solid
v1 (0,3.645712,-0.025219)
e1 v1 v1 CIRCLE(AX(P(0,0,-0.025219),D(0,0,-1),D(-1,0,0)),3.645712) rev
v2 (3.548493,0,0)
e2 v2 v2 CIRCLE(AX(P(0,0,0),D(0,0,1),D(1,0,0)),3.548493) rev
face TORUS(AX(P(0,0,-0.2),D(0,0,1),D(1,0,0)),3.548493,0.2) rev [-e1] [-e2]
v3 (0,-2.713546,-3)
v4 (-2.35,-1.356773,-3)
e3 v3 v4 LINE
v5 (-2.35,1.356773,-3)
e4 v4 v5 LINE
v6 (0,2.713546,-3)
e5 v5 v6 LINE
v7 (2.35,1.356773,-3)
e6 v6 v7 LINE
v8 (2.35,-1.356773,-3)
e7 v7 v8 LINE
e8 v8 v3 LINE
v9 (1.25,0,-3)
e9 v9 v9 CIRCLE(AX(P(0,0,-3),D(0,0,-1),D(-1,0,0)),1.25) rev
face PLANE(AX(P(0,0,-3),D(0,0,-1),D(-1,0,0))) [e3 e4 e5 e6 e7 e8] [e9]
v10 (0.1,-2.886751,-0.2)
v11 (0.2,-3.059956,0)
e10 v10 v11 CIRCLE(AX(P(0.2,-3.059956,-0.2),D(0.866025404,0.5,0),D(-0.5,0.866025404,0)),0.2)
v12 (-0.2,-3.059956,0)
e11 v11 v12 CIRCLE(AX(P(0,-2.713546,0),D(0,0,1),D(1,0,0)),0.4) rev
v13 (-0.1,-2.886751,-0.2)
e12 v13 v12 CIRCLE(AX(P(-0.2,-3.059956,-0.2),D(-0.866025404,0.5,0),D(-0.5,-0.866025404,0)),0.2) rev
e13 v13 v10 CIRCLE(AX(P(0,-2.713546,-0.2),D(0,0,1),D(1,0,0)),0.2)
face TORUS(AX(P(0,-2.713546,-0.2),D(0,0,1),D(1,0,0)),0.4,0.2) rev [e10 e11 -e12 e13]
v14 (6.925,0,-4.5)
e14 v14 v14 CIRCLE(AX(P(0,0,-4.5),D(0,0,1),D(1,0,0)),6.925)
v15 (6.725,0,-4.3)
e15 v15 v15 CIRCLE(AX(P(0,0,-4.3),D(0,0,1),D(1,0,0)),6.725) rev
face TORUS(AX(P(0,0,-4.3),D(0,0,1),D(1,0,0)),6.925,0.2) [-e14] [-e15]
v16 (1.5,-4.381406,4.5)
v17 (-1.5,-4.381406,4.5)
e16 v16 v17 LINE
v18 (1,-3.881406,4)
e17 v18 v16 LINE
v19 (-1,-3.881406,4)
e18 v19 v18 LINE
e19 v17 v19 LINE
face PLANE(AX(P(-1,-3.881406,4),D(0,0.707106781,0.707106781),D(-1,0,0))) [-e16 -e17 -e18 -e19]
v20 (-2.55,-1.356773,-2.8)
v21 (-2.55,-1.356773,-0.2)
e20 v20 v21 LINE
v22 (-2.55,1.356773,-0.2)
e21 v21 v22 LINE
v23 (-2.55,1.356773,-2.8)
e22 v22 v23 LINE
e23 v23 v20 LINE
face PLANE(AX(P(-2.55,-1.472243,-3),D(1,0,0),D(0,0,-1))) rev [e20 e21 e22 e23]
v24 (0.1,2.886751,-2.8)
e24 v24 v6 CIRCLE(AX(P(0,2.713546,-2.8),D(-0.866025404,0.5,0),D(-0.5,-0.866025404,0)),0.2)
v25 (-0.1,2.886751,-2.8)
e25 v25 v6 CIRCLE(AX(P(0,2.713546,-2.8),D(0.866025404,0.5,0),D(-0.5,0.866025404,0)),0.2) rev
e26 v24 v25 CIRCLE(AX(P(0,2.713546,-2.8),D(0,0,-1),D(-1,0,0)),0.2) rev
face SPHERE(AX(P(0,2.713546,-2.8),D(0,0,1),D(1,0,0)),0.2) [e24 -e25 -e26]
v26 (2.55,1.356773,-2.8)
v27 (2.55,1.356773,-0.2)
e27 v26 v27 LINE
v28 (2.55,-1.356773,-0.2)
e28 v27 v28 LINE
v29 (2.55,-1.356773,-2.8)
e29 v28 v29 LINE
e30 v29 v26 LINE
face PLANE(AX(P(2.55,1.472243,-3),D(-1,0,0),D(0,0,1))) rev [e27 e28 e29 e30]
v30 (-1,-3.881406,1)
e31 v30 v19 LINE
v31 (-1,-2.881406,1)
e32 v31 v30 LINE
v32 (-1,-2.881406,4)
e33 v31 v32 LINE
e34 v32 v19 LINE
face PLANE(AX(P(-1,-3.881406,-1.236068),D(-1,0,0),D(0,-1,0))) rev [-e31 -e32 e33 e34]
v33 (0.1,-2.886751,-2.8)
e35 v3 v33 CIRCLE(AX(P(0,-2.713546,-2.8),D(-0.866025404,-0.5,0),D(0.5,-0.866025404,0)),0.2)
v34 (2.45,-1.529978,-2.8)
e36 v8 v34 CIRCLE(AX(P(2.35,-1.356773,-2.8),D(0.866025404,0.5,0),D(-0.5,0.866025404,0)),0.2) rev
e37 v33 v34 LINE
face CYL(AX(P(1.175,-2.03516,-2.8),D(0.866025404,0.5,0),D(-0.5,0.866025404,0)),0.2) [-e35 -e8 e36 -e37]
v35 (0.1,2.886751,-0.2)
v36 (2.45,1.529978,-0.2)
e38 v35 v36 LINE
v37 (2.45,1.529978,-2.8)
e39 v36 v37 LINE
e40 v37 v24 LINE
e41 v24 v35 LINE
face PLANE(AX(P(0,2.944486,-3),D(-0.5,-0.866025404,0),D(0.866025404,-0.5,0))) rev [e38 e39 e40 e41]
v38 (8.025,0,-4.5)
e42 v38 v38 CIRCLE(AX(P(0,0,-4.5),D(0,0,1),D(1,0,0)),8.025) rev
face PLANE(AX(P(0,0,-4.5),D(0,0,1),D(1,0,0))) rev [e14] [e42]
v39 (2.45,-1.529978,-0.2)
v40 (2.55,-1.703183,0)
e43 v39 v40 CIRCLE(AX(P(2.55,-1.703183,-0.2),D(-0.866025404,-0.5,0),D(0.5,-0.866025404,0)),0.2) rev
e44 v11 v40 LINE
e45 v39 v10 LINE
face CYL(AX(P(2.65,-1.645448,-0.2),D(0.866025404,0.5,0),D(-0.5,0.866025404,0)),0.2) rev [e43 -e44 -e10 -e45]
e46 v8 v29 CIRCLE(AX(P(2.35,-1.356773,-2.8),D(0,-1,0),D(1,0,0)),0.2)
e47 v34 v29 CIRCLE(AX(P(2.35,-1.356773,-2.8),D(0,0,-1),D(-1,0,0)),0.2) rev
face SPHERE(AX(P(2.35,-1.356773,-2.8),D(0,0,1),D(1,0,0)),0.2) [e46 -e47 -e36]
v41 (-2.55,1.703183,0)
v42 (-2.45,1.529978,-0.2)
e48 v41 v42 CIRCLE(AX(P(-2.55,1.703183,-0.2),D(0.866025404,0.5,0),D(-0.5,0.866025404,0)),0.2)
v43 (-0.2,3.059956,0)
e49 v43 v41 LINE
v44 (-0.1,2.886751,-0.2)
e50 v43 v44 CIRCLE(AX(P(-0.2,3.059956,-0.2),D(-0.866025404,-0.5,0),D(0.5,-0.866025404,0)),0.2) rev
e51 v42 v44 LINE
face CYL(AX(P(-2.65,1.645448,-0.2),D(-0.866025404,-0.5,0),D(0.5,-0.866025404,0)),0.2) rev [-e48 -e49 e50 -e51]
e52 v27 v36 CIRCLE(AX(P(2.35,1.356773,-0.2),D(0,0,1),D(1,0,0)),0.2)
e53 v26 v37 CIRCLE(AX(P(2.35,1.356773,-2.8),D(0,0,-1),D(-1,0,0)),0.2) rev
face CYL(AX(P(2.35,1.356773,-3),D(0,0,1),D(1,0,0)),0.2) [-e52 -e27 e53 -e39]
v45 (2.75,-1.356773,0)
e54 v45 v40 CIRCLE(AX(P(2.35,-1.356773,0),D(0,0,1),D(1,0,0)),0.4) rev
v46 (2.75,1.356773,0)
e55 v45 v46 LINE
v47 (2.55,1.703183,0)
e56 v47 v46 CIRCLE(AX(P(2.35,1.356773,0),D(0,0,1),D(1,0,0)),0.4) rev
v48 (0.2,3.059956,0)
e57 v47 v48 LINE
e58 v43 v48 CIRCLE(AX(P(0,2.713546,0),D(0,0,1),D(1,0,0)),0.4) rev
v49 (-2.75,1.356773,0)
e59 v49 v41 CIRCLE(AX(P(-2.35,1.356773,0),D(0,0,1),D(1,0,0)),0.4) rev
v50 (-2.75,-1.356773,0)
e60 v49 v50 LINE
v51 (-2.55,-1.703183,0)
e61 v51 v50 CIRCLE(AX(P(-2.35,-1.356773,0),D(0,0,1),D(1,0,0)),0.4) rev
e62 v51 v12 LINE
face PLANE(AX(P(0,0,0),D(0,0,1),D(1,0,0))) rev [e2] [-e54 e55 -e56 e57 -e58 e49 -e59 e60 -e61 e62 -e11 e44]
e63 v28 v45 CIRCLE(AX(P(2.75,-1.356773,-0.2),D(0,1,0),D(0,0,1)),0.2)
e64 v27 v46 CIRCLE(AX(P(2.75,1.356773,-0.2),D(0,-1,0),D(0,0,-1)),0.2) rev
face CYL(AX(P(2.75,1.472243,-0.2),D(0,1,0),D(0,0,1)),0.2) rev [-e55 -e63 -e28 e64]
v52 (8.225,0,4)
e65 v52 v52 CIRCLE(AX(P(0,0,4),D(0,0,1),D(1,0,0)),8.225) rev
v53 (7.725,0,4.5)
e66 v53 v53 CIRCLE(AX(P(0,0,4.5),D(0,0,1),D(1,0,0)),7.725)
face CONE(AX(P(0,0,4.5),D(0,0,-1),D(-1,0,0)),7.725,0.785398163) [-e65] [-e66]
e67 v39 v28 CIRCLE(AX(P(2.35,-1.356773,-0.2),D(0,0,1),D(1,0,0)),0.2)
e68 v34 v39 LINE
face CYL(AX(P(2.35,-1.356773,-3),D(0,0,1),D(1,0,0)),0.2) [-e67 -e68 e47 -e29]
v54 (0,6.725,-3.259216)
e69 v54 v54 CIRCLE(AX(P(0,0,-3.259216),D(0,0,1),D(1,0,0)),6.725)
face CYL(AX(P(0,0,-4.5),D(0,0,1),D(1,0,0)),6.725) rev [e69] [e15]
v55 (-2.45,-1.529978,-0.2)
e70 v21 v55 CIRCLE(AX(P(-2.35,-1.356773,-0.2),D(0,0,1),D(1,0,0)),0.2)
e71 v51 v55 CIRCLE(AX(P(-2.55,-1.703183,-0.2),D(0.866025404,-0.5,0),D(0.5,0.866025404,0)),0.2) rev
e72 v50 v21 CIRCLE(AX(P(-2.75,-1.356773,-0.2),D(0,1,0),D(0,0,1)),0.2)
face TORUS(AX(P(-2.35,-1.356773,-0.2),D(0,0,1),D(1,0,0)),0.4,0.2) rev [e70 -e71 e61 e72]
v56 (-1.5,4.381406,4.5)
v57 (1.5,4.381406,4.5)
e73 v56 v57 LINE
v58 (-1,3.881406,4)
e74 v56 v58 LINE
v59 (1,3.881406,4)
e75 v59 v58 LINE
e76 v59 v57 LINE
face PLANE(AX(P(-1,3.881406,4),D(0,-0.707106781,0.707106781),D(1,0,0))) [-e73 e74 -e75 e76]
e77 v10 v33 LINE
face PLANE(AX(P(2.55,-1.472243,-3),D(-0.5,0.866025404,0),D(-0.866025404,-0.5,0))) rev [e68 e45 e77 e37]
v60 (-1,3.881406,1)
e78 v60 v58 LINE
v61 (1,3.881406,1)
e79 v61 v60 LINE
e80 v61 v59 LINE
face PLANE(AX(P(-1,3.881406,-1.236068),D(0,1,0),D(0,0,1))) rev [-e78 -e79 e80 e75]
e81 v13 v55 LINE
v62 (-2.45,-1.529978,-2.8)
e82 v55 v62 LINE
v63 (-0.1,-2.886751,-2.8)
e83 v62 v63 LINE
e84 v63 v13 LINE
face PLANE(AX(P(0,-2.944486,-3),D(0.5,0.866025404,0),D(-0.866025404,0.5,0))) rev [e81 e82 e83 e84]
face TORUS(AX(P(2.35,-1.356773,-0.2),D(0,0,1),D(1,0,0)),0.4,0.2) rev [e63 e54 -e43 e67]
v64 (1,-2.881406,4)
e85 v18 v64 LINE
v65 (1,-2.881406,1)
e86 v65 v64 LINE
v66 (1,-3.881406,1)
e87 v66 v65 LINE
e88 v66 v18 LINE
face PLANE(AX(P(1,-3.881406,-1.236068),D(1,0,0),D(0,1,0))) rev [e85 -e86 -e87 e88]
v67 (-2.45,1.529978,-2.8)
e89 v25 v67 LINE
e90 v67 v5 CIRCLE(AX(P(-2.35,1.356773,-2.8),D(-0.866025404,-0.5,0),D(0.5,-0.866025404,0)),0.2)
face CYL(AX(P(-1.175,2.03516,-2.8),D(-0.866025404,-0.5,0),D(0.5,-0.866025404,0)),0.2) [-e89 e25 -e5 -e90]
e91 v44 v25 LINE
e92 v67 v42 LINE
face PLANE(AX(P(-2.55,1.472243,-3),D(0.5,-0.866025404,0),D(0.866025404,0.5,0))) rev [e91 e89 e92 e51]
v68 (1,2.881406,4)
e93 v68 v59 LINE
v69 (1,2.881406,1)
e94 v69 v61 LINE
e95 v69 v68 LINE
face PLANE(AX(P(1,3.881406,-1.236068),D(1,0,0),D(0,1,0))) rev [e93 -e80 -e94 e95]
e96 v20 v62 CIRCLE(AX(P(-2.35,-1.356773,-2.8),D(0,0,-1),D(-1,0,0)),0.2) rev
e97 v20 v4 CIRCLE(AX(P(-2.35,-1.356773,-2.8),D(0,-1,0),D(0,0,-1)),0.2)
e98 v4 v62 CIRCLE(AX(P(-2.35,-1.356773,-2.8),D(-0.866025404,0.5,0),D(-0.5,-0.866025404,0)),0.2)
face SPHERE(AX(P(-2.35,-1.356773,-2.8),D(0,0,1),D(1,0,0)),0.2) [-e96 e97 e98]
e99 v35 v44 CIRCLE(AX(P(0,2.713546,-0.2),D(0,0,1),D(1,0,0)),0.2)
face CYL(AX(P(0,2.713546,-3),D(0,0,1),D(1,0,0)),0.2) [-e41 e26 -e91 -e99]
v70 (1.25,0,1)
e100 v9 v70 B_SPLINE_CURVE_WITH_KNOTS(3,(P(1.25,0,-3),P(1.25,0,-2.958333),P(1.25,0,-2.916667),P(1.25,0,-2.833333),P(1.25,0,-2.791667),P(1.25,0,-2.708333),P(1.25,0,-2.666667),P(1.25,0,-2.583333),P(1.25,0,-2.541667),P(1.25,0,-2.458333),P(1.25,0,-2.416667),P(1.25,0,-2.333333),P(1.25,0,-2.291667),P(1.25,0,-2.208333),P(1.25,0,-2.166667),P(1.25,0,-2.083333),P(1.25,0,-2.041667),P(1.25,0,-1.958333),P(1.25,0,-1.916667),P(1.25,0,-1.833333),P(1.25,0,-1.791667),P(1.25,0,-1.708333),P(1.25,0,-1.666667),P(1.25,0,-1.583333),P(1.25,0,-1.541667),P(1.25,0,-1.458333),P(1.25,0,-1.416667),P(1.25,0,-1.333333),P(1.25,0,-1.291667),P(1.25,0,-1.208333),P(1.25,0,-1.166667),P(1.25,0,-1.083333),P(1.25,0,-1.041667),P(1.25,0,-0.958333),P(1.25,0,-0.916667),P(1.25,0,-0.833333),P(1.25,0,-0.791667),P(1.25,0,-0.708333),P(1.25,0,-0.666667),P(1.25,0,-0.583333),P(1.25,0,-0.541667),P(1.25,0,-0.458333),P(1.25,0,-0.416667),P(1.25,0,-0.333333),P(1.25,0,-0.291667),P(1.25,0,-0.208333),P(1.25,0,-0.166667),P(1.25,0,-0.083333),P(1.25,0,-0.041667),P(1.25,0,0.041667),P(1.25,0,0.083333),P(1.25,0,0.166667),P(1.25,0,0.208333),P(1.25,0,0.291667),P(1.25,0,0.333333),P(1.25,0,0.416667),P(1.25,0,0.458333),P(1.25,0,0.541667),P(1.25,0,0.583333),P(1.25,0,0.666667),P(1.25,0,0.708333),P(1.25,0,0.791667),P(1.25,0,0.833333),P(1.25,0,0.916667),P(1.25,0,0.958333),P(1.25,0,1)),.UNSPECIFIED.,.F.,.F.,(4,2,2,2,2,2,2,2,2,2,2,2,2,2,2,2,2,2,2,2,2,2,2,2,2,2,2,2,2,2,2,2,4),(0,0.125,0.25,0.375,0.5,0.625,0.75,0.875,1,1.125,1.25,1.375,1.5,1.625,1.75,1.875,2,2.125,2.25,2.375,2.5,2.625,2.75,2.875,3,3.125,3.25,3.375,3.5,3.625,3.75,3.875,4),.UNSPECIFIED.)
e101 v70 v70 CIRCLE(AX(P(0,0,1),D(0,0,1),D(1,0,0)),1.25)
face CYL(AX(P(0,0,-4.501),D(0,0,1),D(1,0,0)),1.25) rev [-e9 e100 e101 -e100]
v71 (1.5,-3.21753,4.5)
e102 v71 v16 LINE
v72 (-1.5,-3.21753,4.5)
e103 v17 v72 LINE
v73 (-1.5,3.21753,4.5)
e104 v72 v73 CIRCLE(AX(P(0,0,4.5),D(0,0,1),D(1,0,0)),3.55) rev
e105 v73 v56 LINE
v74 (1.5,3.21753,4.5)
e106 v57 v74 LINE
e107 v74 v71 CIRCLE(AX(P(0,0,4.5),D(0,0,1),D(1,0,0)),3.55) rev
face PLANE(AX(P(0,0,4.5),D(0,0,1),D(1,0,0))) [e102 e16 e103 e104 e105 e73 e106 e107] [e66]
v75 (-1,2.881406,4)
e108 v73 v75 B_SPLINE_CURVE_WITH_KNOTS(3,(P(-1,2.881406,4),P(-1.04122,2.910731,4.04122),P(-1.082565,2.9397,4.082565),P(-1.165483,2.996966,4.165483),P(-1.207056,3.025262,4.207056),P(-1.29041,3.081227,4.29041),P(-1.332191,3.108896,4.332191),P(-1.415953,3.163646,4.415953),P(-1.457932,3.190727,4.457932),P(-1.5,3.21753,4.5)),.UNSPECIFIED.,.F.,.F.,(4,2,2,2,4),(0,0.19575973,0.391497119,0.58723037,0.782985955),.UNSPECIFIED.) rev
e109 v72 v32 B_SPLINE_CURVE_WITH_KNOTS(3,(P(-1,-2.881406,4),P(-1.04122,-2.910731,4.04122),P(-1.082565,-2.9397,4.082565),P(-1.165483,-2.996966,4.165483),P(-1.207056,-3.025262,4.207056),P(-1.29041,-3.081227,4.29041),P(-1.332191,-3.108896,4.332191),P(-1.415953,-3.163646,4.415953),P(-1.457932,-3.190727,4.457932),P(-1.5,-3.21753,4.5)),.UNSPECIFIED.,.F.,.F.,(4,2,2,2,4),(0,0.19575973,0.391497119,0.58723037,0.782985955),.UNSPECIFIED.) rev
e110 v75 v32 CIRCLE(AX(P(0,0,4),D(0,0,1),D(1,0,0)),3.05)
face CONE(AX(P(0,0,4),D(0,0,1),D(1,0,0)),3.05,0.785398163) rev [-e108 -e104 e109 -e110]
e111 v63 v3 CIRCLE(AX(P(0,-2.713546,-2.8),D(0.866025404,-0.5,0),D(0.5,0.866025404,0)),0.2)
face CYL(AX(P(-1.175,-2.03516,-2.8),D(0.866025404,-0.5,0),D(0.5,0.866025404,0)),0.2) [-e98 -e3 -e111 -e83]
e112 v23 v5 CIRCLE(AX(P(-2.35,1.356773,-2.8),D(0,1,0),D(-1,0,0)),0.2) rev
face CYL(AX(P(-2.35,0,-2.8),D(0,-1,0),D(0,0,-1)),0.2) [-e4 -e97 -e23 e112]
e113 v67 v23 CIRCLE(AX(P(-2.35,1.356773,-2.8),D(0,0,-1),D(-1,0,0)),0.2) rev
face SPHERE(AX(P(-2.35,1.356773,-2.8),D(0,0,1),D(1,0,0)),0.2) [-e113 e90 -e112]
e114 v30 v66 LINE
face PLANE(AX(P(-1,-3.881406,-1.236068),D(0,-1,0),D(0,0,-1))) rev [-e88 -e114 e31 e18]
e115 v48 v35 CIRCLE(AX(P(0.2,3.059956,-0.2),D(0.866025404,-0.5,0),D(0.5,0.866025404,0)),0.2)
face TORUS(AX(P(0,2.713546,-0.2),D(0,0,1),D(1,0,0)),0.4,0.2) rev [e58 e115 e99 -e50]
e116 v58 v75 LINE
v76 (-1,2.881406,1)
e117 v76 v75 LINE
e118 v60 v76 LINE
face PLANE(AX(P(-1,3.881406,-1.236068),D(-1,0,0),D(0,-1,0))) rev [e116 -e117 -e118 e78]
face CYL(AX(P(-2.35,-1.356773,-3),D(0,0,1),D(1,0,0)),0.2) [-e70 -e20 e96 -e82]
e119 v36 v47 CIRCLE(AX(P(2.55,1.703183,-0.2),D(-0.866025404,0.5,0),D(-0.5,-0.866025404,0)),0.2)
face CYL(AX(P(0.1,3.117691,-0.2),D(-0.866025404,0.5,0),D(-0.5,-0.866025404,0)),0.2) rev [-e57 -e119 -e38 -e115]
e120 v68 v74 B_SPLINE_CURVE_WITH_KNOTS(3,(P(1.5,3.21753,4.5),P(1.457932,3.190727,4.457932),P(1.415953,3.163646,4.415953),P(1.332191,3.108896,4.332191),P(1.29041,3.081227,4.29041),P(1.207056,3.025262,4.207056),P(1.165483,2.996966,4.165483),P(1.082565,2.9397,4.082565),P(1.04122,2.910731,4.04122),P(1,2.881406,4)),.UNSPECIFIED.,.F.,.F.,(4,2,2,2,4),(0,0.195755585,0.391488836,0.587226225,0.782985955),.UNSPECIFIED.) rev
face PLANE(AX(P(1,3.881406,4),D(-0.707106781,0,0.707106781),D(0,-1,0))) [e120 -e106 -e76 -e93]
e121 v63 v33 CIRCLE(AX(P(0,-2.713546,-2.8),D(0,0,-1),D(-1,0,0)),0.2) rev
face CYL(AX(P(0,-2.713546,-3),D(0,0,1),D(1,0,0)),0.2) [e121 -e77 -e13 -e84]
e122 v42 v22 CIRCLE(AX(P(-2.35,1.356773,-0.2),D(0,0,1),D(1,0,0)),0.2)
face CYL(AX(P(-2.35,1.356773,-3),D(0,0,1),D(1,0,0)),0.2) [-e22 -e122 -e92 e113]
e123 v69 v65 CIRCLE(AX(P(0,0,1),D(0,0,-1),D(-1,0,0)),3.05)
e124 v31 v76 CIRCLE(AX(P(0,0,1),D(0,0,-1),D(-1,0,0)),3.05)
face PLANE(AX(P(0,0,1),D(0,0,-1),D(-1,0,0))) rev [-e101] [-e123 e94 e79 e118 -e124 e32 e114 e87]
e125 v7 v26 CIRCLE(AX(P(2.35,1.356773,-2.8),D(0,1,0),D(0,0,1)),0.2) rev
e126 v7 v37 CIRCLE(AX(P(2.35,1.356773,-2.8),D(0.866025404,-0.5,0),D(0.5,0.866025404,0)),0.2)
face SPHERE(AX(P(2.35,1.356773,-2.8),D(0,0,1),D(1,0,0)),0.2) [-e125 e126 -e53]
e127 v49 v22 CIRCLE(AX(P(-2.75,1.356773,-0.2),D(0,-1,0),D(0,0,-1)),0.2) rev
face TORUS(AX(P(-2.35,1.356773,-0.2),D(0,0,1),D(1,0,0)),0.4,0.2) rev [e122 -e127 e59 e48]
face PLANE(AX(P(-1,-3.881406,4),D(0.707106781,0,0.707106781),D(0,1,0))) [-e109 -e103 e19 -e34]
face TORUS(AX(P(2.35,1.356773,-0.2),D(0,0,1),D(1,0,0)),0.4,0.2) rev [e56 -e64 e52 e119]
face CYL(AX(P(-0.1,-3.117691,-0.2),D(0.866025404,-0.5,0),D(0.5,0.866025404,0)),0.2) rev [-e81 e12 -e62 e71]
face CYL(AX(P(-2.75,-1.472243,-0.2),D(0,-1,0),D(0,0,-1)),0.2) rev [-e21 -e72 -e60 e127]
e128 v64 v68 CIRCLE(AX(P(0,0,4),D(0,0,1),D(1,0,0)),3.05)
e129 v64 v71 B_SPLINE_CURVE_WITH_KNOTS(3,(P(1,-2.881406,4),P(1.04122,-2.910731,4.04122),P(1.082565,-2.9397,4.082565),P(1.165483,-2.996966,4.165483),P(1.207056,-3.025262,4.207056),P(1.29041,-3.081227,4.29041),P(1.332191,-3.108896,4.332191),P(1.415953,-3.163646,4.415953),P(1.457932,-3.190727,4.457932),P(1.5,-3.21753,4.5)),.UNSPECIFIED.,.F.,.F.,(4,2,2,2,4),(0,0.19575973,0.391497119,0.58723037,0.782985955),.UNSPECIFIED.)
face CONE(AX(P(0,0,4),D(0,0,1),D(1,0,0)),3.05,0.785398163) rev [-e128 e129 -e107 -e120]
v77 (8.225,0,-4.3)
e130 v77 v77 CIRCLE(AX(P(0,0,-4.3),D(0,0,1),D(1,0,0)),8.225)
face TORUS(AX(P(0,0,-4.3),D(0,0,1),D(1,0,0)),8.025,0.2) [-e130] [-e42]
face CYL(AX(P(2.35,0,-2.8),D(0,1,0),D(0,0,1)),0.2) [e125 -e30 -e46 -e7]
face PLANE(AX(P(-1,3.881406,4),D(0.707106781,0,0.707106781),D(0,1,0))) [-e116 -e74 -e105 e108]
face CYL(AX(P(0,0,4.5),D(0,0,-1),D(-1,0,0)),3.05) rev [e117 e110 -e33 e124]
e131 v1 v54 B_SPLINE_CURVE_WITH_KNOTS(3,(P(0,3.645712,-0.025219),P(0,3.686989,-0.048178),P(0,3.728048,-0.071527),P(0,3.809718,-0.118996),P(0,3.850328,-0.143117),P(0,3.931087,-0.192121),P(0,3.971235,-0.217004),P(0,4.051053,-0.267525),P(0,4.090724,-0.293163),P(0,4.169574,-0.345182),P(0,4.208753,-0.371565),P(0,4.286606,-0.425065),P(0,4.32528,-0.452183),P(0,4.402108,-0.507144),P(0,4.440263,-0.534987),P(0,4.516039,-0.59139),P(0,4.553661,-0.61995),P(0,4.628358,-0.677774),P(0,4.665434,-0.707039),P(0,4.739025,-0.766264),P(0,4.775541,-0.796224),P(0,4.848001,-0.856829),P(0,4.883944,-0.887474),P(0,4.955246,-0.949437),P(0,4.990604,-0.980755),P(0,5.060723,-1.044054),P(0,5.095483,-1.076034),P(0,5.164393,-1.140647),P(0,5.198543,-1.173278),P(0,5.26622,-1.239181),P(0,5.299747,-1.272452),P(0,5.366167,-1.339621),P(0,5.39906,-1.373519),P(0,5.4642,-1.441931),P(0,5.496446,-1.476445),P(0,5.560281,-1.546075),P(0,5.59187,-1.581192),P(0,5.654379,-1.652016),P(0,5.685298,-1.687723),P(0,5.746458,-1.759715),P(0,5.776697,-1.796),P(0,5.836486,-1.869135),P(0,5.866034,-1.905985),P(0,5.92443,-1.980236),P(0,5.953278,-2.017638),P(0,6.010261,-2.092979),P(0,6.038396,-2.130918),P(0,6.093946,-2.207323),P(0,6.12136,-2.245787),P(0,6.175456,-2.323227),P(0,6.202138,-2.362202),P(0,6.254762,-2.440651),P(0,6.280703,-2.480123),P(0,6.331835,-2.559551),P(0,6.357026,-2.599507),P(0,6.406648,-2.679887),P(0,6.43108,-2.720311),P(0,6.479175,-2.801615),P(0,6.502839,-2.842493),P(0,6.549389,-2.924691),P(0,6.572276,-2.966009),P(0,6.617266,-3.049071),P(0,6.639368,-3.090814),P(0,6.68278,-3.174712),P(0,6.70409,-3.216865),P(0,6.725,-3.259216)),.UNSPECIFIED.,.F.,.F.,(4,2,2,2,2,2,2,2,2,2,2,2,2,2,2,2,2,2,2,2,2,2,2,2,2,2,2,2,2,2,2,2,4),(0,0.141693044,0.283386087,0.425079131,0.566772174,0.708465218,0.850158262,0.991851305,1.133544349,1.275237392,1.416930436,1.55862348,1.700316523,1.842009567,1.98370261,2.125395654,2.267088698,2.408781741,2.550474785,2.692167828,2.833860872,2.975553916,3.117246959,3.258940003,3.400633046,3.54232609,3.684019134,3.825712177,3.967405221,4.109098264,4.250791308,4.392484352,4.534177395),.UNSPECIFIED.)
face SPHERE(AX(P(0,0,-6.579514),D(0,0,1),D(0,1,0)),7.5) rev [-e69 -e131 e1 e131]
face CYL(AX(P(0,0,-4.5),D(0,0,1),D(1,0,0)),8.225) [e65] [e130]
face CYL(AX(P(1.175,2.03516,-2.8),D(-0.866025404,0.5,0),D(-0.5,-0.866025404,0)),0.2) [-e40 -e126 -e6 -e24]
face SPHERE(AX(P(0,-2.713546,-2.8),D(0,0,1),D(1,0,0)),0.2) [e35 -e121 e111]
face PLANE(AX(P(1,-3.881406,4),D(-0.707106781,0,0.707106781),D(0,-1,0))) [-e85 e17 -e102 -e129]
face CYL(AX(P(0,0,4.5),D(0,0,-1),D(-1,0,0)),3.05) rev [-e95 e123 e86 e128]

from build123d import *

# Parameters (mm, degrees)
SKETCH1_R           = 6.725
SKETCH1_R_2         = 3.05
BOSS_EXTRUDE1_DEPTH = 4.5
SKETCH3_R           = 3.05
BOSS_EXTRUDE3_DEPTH = 1
BOSS_EXTRUDE4_DEPTH = 3
SKETCH5_R           = 8.225
SKETCH5_R_2         = 6.725
BOSS_EXTRUDE5_DEPTH = 9
FILLET1_R           = 0.2
CUT_EXTRUDE1_REACH  = 14.867
SKETCH6_R           = 1.25
SKETCH7_W           = 2
SKETCH7_H           = 1
CUT_EXTRUDE2_DEPTH  = 3.5
CHAMFER1_SIZE       = 0.5


# Read off the part's stored shape, not the designer's step: Boss-Extrude2
with BuildPart() as part:
    # Sketch1 → Boss-Extrude1 (new body)
    with BuildSketch(Plane.XY):
        Circle(SKETCH1_R)
        Circle(SKETCH1_R_2, mode=Mode.SUBTRACT)
    extrude(amount=BOSS_EXTRUDE1_DEPTH)

    # Boss-Extrude2 outline → Boss-Extrude2 (revolve)
    with BuildSketch(Plane.XZ):
        with BuildLine():
            Line((6.725000003, -3.25921624), (6.725, 1e-09))
            Line((6.725, 1e-09), (3.599999993, 4e-09))
            ThreePointArc((3.599999993, 4e-09), (5.413596666, -1.388851743), (6.725000003, -3.25921624))
        make_face()
    revolve(axis=Axis((0, 0, 0), (0, 0, 1)))

    # Sketch3 → Boss-Extrude3 (add)
    with BuildSketch(Plane(origin=(0, 0, 0), x_dir=(-1, 0, 0), z_dir=(0, 0, -1))):
        Circle(SKETCH3_R)
    extrude(amount=-BOSS_EXTRUDE3_DEPTH)

    # Sketch4 → Boss-Extrude4 (add)
    with BuildSketch(Plane(origin=(0, 0, 0), x_dir=(-1, 0, 0), z_dir=(0, 0, -1))):
        Polygon((0, -2.944486373), (2.55, -1.472243186), (2.55, 1.472243186), (0, 2.944486373), (-2.55, 1.472243186), (-2.55, -1.472243186), align=None)
    extrude(amount=BOSS_EXTRUDE4_DEPTH)

    # Sketch5 → Boss-Extrude5 (add)
    with BuildSketch(Plane.XY.offset(4.5)):
        Circle(SKETCH5_R)
        Circle(SKETCH5_R_2, mode=Mode.SUBTRACT)
    extrude(amount=-BOSS_EXTRUDE5_DEPTH)

    # Fillet1
    fillet1_edges = [part.edges().sort_by_distance(p)[0] for p in [
        (1.275, -2.20836478, 0),
        (2.55, -1.472243186, -1.5),
        (-1.275, -2.20836478, 0),
        (0, -2.944486373, -1.5),
        (-2.55, 0, 0),
        (-2.55, -1.472243186, -1.5),
        (-1.275, 2.20836478, 0),
        (-2.55, 1.472243186, -1.5),
        (1.275, 2.20836478, 0),
        (0, 2.944486373, -1.5),
        (2.55, 0, 0),
        (2.55, 1.472243186, -1.5),
        (1.275, -2.20836478, -3),
        (-1.275, -2.20836478, -3),
        (-2.55, 0, -3),
        (-1.275, 2.20836478, -3),
        (1.275, 2.20836478, -3),
        (2.55, 0, -3),
        (-8.225, 0, -4.5),
        (-6.725, 0, -4.5),
        (-3.599999993, 0, 4e-09),
    ]]
    fillet(fillet1_edges, radius=FILLET1_R)

    # Sketch6 → Cut-Extrude1 (cut, up to next)
    with BuildSketch(Plane.XY.offset(1), mode=Mode.PRIVATE) as cut_extrude1_sk1:
        Circle(SKETCH6_R)
    cut_extrude1_tool1 = extrude(cut_extrude1_sk1.sketch, amount=-CUT_EXTRUDE1_REACH, mode=Mode.PRIVATE) & part.part
    add(cut_extrude1_tool1.solids().sort_by_distance((0, 0, 1))[0], mode=Mode.SUBTRACT)

    # Sketch7 → Cut-Extrude2 (cut)
    with BuildSketch(Plane.XY.offset(4.5)):
        with Locations((0, 3.381405907)):
            Rectangle(SKETCH7_W, SKETCH7_H)
        with Locations((0, -3.381405907)):
            Rectangle(SKETCH7_W, SKETCH7_H)
    extrude(amount=-CUT_EXTRUDE2_DEPTH, mode=Mode.SUBTRACT)

    # Chamfer1
    chamfer1_edges = [part.edges().sort_by_distance(p)[0] for p in [
        (-3.05, 0, 4.5),
        (3.05, 0, 4.5),
        (1, 3.381405907, 4.5),
        (0, 3.881405907, 4.5),
        (-1, 3.381405907, 4.5),
        (1, -3.381405907, 4.5),
        (-1, -3.381405907, 4.5),
        (0, -3.881405907, 4.5),
        (-8.225, 0, 4.5),
    ]]
    chamfer(chamfer1_edges, length=CHAMFER1_SIZE)


solid = part.part
